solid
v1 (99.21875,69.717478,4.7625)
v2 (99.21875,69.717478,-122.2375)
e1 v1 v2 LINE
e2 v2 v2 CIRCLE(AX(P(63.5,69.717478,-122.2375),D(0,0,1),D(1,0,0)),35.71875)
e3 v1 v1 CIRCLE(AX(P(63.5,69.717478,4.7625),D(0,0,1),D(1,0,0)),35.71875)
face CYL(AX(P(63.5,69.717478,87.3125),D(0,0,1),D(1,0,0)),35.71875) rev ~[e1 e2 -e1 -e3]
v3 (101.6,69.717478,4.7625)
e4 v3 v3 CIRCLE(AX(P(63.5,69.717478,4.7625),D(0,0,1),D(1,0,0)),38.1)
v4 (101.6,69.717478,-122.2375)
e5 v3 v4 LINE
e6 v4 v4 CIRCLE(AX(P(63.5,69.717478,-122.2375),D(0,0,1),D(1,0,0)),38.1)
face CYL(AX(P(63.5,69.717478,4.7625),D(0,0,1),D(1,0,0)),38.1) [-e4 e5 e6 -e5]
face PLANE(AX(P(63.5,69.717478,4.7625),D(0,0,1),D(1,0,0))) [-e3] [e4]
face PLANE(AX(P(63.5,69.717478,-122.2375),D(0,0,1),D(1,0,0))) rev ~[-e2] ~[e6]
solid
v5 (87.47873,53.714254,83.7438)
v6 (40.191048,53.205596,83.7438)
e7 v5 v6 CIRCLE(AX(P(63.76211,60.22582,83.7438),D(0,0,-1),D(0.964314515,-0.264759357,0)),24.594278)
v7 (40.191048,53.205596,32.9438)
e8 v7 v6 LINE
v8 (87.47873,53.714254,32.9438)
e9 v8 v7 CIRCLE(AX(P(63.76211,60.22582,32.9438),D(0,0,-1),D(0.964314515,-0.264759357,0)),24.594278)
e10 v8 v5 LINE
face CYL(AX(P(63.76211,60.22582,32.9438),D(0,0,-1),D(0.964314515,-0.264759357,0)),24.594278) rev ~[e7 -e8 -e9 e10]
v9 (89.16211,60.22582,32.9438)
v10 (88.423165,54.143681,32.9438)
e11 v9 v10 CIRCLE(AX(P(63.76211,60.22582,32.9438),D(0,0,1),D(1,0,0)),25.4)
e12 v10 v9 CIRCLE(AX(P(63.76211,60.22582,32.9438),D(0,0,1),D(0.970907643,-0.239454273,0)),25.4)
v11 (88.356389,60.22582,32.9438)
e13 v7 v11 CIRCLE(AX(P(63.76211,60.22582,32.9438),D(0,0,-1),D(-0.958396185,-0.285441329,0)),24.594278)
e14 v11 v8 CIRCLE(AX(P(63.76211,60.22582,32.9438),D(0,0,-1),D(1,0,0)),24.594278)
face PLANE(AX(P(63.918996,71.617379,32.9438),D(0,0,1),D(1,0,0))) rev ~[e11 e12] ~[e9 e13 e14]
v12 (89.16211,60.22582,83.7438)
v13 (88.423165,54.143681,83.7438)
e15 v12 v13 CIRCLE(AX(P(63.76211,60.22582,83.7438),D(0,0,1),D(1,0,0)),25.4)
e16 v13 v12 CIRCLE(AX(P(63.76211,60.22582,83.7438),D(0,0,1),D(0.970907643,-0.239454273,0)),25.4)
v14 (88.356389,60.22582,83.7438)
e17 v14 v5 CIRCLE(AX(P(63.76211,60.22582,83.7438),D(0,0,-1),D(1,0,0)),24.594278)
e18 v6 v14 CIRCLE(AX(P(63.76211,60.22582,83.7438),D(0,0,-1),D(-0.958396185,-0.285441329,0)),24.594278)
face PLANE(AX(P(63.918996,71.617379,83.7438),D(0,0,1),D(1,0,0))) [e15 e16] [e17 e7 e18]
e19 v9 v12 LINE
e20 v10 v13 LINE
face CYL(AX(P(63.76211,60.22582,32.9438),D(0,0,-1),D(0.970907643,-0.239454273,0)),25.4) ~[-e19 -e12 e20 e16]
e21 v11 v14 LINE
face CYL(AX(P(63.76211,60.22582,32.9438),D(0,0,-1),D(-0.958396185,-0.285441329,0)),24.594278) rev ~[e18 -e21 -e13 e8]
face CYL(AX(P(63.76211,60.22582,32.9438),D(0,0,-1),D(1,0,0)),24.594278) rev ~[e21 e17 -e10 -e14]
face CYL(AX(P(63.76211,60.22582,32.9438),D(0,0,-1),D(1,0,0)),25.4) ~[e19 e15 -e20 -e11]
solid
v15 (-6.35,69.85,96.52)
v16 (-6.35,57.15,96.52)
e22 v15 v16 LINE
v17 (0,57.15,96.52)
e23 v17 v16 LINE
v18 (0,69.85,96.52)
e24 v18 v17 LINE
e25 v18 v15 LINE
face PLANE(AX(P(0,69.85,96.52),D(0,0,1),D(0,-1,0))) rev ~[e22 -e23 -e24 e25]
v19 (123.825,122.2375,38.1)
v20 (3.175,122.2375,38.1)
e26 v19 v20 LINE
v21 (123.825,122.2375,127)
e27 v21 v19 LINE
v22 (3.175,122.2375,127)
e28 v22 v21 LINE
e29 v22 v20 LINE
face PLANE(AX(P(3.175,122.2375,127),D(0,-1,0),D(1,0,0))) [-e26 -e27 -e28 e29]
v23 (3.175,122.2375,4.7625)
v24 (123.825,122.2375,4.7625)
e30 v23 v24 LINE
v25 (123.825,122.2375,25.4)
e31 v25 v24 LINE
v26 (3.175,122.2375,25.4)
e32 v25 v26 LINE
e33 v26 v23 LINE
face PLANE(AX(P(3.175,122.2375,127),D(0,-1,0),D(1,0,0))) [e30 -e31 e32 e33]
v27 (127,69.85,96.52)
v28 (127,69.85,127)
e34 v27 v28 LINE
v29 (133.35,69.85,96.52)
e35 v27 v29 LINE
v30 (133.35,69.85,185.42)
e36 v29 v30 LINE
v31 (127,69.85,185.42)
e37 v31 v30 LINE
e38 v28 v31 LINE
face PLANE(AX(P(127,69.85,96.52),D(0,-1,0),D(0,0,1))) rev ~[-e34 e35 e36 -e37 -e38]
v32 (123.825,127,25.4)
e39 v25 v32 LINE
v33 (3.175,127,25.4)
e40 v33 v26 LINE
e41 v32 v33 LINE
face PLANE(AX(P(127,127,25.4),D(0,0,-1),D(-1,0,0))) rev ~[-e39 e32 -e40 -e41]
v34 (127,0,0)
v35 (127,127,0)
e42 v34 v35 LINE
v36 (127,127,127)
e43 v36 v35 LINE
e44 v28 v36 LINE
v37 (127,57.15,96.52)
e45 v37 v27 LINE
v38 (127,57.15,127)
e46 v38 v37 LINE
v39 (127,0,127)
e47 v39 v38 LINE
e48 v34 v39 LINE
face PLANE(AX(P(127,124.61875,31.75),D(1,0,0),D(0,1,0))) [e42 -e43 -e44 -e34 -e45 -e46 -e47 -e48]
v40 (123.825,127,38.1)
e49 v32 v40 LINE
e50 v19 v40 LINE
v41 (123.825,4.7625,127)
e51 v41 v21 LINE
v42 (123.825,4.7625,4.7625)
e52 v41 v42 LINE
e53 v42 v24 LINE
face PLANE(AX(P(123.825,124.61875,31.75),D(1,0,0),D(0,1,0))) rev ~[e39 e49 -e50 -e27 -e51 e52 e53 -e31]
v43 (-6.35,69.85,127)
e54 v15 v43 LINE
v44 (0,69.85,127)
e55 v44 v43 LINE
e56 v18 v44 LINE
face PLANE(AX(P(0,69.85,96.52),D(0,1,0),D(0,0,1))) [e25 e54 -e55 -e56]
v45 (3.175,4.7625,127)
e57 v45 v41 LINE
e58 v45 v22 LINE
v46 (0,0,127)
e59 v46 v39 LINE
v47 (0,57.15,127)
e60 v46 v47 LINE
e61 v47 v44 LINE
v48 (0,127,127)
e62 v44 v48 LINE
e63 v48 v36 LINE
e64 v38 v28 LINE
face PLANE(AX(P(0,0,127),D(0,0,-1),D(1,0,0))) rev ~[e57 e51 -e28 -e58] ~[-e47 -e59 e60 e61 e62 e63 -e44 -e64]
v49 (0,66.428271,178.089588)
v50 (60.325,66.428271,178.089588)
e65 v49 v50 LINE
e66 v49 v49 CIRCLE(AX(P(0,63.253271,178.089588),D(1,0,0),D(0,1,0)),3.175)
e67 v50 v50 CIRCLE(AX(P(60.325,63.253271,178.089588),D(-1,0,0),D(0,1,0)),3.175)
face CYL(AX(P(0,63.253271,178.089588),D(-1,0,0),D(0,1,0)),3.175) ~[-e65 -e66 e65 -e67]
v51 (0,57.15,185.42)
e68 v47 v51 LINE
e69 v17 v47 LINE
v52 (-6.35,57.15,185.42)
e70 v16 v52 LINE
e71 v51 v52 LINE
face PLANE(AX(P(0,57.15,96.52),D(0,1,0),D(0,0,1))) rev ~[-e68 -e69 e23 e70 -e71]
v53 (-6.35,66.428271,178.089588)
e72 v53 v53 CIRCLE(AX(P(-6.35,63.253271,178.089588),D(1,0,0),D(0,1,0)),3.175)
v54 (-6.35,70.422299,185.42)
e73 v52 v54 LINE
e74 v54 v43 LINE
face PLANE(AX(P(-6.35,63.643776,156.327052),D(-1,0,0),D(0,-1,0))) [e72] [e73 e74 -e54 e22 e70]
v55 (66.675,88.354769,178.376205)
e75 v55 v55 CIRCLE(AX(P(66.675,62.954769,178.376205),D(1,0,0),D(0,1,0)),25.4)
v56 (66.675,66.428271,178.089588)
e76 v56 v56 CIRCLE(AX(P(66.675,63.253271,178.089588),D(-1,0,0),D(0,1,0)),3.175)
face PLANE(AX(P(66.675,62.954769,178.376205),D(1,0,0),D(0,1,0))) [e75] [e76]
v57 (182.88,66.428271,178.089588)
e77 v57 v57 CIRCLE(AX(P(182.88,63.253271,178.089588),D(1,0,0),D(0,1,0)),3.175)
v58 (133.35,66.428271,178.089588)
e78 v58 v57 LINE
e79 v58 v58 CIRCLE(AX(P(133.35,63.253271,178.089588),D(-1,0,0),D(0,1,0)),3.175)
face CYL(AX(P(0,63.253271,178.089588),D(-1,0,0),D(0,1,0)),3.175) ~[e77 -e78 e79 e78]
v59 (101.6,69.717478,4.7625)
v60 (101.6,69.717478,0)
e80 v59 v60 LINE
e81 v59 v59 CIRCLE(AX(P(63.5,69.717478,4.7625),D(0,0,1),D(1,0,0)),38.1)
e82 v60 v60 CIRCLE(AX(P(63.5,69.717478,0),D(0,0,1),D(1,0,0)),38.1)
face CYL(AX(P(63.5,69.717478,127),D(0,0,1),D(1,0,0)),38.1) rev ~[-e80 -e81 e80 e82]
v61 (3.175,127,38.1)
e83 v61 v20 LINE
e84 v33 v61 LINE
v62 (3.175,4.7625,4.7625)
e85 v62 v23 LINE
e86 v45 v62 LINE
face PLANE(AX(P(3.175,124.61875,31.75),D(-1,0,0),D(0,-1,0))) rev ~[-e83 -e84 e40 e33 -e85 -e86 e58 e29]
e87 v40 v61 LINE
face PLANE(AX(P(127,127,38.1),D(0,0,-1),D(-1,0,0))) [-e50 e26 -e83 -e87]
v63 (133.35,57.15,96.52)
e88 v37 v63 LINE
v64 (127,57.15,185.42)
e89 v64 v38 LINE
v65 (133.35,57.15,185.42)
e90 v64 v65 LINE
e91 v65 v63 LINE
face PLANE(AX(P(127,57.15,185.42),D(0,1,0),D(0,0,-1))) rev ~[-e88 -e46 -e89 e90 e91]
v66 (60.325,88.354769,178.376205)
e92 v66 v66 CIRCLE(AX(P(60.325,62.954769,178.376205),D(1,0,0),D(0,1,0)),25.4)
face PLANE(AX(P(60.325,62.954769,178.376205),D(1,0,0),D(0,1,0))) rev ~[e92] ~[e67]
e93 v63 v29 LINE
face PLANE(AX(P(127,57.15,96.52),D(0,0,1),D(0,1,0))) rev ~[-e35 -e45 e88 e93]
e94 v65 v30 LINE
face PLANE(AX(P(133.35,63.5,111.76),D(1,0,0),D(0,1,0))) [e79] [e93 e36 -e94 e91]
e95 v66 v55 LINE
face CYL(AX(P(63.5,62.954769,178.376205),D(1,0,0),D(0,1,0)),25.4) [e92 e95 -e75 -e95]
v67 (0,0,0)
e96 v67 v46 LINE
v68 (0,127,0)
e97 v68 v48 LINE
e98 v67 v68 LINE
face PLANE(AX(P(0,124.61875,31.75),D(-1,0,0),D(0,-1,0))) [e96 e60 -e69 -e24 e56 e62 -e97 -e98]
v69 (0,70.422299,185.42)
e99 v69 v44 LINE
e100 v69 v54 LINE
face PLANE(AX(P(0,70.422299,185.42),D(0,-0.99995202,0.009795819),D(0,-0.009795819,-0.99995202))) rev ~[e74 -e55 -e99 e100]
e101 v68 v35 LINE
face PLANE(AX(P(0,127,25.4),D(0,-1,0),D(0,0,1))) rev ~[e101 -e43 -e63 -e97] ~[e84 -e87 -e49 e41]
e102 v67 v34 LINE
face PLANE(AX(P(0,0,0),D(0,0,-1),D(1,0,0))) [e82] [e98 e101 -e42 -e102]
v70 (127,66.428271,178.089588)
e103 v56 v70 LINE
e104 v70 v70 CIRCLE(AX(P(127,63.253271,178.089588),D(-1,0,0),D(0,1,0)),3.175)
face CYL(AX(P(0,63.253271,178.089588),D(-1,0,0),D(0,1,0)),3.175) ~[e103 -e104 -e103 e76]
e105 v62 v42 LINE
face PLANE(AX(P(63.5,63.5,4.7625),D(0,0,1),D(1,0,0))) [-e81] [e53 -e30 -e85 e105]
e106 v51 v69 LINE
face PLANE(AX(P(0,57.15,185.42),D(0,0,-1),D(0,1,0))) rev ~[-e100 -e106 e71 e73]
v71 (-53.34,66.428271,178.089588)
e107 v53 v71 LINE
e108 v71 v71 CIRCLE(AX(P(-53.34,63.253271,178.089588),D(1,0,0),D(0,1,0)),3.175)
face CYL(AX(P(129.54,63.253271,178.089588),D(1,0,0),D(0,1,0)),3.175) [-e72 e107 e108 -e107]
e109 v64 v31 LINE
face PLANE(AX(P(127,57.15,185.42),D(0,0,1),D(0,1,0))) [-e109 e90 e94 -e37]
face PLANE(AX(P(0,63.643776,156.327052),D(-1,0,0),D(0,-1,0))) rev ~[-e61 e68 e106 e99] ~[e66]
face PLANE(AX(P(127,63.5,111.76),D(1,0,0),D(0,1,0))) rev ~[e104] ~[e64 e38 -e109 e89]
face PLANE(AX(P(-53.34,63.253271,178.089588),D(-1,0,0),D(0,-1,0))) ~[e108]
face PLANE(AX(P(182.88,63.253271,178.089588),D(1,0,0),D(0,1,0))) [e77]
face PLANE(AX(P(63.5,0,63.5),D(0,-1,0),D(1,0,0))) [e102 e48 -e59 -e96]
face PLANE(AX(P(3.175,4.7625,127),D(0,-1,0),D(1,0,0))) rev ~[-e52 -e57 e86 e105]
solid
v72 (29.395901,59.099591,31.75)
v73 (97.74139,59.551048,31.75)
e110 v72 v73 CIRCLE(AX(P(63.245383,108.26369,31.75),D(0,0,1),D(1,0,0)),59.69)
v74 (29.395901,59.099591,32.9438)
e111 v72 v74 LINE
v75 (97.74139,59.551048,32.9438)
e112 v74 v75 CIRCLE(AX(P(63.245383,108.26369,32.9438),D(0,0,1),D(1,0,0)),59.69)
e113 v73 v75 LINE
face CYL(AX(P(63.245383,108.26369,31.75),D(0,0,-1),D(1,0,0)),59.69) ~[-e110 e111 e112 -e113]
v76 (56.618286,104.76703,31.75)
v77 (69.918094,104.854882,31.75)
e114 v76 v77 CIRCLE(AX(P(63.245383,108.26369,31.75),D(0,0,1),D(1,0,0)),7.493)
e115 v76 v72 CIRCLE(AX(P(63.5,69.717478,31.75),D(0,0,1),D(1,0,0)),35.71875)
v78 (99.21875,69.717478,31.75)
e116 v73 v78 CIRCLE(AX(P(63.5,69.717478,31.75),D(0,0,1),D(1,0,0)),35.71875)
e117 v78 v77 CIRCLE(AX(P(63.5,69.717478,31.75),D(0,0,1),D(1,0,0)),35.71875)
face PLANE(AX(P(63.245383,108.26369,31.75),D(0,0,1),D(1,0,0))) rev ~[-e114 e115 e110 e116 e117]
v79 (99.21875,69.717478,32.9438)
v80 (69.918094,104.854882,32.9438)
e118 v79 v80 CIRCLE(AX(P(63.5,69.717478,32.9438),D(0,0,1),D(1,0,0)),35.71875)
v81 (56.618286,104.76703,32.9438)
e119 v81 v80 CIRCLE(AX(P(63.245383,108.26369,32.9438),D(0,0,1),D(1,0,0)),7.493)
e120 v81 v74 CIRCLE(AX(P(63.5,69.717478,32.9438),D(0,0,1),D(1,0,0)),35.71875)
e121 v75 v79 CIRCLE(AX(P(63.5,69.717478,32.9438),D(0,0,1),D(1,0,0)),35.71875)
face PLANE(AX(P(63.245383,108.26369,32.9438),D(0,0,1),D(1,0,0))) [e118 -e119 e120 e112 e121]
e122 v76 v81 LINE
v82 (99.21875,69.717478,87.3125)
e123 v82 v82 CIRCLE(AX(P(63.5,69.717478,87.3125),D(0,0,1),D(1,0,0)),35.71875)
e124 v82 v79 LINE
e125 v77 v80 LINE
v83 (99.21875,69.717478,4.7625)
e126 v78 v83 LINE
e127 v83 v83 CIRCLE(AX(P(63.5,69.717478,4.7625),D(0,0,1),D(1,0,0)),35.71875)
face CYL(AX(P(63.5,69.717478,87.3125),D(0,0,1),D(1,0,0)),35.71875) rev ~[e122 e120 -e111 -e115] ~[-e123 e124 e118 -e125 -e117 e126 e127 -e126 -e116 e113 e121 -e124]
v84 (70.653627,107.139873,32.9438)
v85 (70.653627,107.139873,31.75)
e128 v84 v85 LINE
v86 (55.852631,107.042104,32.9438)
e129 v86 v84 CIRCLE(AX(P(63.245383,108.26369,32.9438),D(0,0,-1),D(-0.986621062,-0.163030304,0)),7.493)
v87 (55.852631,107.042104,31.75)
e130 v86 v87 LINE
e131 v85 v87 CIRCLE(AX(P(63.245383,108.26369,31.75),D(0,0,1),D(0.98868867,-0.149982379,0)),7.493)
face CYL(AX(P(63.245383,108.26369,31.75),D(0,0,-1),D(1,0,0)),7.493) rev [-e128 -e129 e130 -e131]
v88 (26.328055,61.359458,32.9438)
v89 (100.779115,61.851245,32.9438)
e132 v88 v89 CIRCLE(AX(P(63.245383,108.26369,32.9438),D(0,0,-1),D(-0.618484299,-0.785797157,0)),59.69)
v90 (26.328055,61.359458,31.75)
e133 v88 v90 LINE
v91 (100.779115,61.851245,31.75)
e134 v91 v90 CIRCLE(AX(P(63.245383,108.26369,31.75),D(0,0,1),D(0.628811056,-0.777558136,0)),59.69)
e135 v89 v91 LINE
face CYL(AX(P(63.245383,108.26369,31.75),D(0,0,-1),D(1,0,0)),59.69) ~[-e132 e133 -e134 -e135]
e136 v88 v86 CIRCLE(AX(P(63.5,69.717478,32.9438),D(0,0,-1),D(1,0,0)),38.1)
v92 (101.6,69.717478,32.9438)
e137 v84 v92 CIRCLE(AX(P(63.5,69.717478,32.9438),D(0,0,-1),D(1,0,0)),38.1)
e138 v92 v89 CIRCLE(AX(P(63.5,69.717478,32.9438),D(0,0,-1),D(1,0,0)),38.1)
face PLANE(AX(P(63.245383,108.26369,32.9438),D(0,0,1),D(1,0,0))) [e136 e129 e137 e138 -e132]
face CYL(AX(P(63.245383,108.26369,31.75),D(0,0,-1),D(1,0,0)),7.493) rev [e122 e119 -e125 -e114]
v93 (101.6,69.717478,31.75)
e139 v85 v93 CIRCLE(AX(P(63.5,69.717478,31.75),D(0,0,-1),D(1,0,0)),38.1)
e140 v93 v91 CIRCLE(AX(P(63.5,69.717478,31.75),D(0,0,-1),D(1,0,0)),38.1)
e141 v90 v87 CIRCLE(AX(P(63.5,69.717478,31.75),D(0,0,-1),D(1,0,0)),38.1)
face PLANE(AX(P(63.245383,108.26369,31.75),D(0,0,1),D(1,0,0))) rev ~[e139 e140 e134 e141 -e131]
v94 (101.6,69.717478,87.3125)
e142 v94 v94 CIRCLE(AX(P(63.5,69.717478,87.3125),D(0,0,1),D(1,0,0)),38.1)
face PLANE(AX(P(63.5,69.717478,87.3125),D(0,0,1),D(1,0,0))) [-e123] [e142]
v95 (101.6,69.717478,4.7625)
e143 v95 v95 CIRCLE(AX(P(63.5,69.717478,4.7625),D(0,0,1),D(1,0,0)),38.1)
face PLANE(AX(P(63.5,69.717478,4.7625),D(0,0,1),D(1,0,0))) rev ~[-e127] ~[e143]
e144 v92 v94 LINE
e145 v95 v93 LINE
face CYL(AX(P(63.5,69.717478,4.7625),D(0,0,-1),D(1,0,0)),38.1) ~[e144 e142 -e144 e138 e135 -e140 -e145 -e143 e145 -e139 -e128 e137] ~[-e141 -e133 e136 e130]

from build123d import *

# Parameters (mm, degrees)
F0_W      = 127
F0_H      = 127
F1_DEPTH  = 127
F2_W      = 120.65
F2_H      = 117.475
F3_DEPTH  = 122.2375
F4_R      = 38.1
F5_DEPTH  = 258.318
F6_R      = 38.1
F7_DEPTH  = 82.55
F9_DEPTH  = 127
F8_R      = 35.71875
F10_DEPTH = 222.25
F11_R     = 35.71875
F12_DEPTH = 181.61
F13_W     = 127
F13_H     = 12.7
F14_DEPTH = 4.7625
F15_W     = 4.7625
F15_H     = 12.7
F16_DEPTH = 3.175
F17_W     = 4.7625
F17_H     = 12.7
F18_DEPTH = 3.175
F21_R     = 59.69
F21_R_2   = 7.493
F22_DEPTH = 1.1938
F24_DEPTH = 50.8
F25_W     = 12.7
F25_H     = 30.48
F25_H_2   = 58.42
F26_DEPTH = 6.35
F27_W     = 12.7
F27_H     = 30.48
F28_DEPTH = 6.35
F29_R     = 3.175
F30_DEPTH = 182.88
F33_R     = 25.4
F34_DEPTH = 3.175


# Not quite as in the source:
# - a feature of the source that left no trace in its solid (it failed there, or was rolled back) is left out
# - a pattern or mirror of a feature is missing from the dataset's text; its kind, count and spacing are read off the source's solid


with BuildPart() as f1:
    # F0 (on Front) → F1 (new body)
    with BuildSketch(Plane.XZ):
        with Locations((63.5, 63.5)):
            Rectangle(F0_W, F0_H)
    extrude(amount=-F1_DEPTH)

    # F2 (on face) → F3 (cut)
    with BuildSketch(Plane.XY.offset(127)):
        with Locations((63.5, 63.5)):
            Rectangle(F2_W, F2_H)
    extrude(amount=-F3_DEPTH, mode=Mode.SUBTRACT)

    # F4 (on face) → F5 (cut)
    with BuildSketch(Plane.XY.offset(127)):
        with Locations((63.5, 69.7174778593)):
            Circle(F4_R)
    extrude(amount=-F5_DEPTH, mode=Mode.SUBTRACT)

    # F11 (on face) → F12 (cut)
    with BuildSketch(Plane.XY.offset(4.7625)):
        with Locations((63.5, 69.7174778593)):
            Circle(F11_R)
    extrude(amount=-F12_DEPTH, mode=Mode.SUBTRACT)

    # F13 (on face) → F14 (cut)
    with BuildSketch(Plane(origin=(0, 127, 0), x_dir=(-1, 0, 0), z_dir=(0, 1, 0))):
        with Locations((-63.5, 31.75)):
            Rectangle(F13_W, F13_H)
    extrude(amount=-F14_DEPTH, mode=Mode.SUBTRACT)

    # F15 (on face) → F16 (join)
    with BuildSketch(Plane.YZ.offset(127)):
        with Locations((124.61875, 31.75)):
            Rectangle(F15_W, F15_H)
    extrude(amount=-F16_DEPTH)

    # F17 (on face) → F18 (join)
    with BuildSketch(Plane(origin=(0, 0, 0), x_dir=(0, -1, 0), z_dir=(-1, 0, 0))):
        with Locations((-124.61875, 31.75)):
            Rectangle(F17_W, F17_H)
    extrude(amount=-F18_DEPTH)

    # F25 (on face) → F26 (join)
    with BuildSketch(Plane.YZ.offset(127)):
        with Locations((63.5, 111.76)):
            Rectangle(F25_W, F25_H)
        with Locations((63.5, 156.21)):
            Rectangle(F25_W, F25_H_2)
    extrude(amount=F26_DEPTH)

    # F27 (on face) → F28 (join)
    with BuildSketch(Plane(origin=(0, 0, 0), x_dir=(0, -1, 0), z_dir=(-1, 0, 0))):
        Polygon((-70.4222992063, 185.42), (-69.85, 127), (-57.15, 127), (-57.15, 185.42), align=None)
        with Locations((-63.5, 111.76)):
            Rectangle(F27_W, F27_H)
    extrude(amount=F28_DEPTH)

    # F29 (on Right) → F30 (join)
    with BuildSketch(Plane.YZ):
        with Locations((63.2532713579, 178.0895883254)):
            Circle(F29_R)
    f30 = extrude(amount=F30_DEPTH)

    # F30_copies: F30 across plane
    add(f30.mirror(Plane(origin=(64.77, 0, 0), x_dir=(0, 0, -1), z_dir=(-1, 0, 0))))

    # F33 (on offset) → F34 (join, symmetric)
    with BuildSketch(Plane.YZ.offset(63.5)):
        with Locations((62.9547689138, 178.3762046341)):
            Circle(F33_R)
    extrude(amount=F34_DEPTH, both=True)


with BuildPart() as f7:
    # F6 (on face) → F7 (new body)
    with BuildSketch(Plane.XY.offset(4.7625)):
        with Locations((63.5, 69.7174778593)):
            Circle(F6_R)
    extrude(amount=F7_DEPTH)


with BuildPart() as f9:
    # F9 (new): a face of the model
    f9_faces = [f7.part.faces().sort_by_distance(p)[0] for p in [
        (63.5, 69.7174778593, 4.7625),
    ]]
    extrude(f9_faces, amount=F9_DEPTH)


with BuildPart() as f10_tool:
    # F8 (on face) → F10 (new body)
    with BuildSketch(Plane.XY.offset(87.3125)):
        with Locations((63.5, 69.7174778593)):
            Circle(F8_R)
    extrude(amount=-F10_DEPTH)


with BuildPart() as f7_1:
    add(f7.part)

    # F10: cut by f10_tool
    add(f10_tool.part, mode=Mode.SUBTRACT)

    # F21 (on plane+point) → F22 (join)
    with BuildSketch(Plane.XY.offset(31.75)):
        with Locations((63.245382659, 108.263690491)):
            Circle(F21_R)
        with Locations((63.245382659, 108.263690491)):
            Circle(F21_R_2, mode=Mode.SUBTRACT)
    extrude(amount=F22_DEPTH)


with BuildPart() as f9_1:
    add(f9.part)

    # F10: cut by f10_tool
    add(f10_tool.part, mode=Mode.SUBTRACT)


with BuildPart() as f24:
    # F23 (on face) → F24 (new body)
    with BuildSketch(Plane.XY.offset(32.9438)):
        with BuildLine():
            ThreePointArc((88.4231645198, 54.143681247), (88.9766971884, 57.1623882847), (89.1621103891, 60.2258197822))
            ThreePointArc((89.1621103891, 60.2258197822), (60.4276466966, 85.4059975394), (39.2375944927, 53.6146080892))
            ThreePointArc((39.2375944927, 53.6146080892), (39.7134324698, 53.4080306163), (40.1910477523, 53.205596245))
            ThreePointArc((40.1910477523, 53.205596245), (60.2149104685, 84.5629499553), (88.3563888363, 60.2258197822))
            ThreePointArc((88.3563888363, 60.2258197822), (88.1359865749, 56.9405964992), (87.4787300717, 53.7142544428))
            ThreePointArc((87.4787300717, 53.7142544428), (87.9518803037, 53.9269158892), (88.4231645198, 54.143681247))
        make_face()
        with BuildLine():
            ThreePointArc((40.1910477523, 53.205596245), (39.7134324698, 53.4080306163), (39.2375944927, 53.6146080892))
            ThreePointArc((39.2375944927, 53.6146080892), (64.0353141115, 34.8272891214), (88.4231645198, 54.143681247))
            ThreePointArc((88.4231645198, 54.143681247), (87.9518803037, 53.9269158892), (87.4787300717, 53.7142544428))
            ThreePointArc((87.4787300717, 53.7142544428), (64.0266477285, 35.6329640648), (40.1910477523, 53.205596245))
        make_face()
    extrude(amount=F24_DEPTH)


solid = Compound([f1.part, f7_1.part, f9_1.part, f24.part])
